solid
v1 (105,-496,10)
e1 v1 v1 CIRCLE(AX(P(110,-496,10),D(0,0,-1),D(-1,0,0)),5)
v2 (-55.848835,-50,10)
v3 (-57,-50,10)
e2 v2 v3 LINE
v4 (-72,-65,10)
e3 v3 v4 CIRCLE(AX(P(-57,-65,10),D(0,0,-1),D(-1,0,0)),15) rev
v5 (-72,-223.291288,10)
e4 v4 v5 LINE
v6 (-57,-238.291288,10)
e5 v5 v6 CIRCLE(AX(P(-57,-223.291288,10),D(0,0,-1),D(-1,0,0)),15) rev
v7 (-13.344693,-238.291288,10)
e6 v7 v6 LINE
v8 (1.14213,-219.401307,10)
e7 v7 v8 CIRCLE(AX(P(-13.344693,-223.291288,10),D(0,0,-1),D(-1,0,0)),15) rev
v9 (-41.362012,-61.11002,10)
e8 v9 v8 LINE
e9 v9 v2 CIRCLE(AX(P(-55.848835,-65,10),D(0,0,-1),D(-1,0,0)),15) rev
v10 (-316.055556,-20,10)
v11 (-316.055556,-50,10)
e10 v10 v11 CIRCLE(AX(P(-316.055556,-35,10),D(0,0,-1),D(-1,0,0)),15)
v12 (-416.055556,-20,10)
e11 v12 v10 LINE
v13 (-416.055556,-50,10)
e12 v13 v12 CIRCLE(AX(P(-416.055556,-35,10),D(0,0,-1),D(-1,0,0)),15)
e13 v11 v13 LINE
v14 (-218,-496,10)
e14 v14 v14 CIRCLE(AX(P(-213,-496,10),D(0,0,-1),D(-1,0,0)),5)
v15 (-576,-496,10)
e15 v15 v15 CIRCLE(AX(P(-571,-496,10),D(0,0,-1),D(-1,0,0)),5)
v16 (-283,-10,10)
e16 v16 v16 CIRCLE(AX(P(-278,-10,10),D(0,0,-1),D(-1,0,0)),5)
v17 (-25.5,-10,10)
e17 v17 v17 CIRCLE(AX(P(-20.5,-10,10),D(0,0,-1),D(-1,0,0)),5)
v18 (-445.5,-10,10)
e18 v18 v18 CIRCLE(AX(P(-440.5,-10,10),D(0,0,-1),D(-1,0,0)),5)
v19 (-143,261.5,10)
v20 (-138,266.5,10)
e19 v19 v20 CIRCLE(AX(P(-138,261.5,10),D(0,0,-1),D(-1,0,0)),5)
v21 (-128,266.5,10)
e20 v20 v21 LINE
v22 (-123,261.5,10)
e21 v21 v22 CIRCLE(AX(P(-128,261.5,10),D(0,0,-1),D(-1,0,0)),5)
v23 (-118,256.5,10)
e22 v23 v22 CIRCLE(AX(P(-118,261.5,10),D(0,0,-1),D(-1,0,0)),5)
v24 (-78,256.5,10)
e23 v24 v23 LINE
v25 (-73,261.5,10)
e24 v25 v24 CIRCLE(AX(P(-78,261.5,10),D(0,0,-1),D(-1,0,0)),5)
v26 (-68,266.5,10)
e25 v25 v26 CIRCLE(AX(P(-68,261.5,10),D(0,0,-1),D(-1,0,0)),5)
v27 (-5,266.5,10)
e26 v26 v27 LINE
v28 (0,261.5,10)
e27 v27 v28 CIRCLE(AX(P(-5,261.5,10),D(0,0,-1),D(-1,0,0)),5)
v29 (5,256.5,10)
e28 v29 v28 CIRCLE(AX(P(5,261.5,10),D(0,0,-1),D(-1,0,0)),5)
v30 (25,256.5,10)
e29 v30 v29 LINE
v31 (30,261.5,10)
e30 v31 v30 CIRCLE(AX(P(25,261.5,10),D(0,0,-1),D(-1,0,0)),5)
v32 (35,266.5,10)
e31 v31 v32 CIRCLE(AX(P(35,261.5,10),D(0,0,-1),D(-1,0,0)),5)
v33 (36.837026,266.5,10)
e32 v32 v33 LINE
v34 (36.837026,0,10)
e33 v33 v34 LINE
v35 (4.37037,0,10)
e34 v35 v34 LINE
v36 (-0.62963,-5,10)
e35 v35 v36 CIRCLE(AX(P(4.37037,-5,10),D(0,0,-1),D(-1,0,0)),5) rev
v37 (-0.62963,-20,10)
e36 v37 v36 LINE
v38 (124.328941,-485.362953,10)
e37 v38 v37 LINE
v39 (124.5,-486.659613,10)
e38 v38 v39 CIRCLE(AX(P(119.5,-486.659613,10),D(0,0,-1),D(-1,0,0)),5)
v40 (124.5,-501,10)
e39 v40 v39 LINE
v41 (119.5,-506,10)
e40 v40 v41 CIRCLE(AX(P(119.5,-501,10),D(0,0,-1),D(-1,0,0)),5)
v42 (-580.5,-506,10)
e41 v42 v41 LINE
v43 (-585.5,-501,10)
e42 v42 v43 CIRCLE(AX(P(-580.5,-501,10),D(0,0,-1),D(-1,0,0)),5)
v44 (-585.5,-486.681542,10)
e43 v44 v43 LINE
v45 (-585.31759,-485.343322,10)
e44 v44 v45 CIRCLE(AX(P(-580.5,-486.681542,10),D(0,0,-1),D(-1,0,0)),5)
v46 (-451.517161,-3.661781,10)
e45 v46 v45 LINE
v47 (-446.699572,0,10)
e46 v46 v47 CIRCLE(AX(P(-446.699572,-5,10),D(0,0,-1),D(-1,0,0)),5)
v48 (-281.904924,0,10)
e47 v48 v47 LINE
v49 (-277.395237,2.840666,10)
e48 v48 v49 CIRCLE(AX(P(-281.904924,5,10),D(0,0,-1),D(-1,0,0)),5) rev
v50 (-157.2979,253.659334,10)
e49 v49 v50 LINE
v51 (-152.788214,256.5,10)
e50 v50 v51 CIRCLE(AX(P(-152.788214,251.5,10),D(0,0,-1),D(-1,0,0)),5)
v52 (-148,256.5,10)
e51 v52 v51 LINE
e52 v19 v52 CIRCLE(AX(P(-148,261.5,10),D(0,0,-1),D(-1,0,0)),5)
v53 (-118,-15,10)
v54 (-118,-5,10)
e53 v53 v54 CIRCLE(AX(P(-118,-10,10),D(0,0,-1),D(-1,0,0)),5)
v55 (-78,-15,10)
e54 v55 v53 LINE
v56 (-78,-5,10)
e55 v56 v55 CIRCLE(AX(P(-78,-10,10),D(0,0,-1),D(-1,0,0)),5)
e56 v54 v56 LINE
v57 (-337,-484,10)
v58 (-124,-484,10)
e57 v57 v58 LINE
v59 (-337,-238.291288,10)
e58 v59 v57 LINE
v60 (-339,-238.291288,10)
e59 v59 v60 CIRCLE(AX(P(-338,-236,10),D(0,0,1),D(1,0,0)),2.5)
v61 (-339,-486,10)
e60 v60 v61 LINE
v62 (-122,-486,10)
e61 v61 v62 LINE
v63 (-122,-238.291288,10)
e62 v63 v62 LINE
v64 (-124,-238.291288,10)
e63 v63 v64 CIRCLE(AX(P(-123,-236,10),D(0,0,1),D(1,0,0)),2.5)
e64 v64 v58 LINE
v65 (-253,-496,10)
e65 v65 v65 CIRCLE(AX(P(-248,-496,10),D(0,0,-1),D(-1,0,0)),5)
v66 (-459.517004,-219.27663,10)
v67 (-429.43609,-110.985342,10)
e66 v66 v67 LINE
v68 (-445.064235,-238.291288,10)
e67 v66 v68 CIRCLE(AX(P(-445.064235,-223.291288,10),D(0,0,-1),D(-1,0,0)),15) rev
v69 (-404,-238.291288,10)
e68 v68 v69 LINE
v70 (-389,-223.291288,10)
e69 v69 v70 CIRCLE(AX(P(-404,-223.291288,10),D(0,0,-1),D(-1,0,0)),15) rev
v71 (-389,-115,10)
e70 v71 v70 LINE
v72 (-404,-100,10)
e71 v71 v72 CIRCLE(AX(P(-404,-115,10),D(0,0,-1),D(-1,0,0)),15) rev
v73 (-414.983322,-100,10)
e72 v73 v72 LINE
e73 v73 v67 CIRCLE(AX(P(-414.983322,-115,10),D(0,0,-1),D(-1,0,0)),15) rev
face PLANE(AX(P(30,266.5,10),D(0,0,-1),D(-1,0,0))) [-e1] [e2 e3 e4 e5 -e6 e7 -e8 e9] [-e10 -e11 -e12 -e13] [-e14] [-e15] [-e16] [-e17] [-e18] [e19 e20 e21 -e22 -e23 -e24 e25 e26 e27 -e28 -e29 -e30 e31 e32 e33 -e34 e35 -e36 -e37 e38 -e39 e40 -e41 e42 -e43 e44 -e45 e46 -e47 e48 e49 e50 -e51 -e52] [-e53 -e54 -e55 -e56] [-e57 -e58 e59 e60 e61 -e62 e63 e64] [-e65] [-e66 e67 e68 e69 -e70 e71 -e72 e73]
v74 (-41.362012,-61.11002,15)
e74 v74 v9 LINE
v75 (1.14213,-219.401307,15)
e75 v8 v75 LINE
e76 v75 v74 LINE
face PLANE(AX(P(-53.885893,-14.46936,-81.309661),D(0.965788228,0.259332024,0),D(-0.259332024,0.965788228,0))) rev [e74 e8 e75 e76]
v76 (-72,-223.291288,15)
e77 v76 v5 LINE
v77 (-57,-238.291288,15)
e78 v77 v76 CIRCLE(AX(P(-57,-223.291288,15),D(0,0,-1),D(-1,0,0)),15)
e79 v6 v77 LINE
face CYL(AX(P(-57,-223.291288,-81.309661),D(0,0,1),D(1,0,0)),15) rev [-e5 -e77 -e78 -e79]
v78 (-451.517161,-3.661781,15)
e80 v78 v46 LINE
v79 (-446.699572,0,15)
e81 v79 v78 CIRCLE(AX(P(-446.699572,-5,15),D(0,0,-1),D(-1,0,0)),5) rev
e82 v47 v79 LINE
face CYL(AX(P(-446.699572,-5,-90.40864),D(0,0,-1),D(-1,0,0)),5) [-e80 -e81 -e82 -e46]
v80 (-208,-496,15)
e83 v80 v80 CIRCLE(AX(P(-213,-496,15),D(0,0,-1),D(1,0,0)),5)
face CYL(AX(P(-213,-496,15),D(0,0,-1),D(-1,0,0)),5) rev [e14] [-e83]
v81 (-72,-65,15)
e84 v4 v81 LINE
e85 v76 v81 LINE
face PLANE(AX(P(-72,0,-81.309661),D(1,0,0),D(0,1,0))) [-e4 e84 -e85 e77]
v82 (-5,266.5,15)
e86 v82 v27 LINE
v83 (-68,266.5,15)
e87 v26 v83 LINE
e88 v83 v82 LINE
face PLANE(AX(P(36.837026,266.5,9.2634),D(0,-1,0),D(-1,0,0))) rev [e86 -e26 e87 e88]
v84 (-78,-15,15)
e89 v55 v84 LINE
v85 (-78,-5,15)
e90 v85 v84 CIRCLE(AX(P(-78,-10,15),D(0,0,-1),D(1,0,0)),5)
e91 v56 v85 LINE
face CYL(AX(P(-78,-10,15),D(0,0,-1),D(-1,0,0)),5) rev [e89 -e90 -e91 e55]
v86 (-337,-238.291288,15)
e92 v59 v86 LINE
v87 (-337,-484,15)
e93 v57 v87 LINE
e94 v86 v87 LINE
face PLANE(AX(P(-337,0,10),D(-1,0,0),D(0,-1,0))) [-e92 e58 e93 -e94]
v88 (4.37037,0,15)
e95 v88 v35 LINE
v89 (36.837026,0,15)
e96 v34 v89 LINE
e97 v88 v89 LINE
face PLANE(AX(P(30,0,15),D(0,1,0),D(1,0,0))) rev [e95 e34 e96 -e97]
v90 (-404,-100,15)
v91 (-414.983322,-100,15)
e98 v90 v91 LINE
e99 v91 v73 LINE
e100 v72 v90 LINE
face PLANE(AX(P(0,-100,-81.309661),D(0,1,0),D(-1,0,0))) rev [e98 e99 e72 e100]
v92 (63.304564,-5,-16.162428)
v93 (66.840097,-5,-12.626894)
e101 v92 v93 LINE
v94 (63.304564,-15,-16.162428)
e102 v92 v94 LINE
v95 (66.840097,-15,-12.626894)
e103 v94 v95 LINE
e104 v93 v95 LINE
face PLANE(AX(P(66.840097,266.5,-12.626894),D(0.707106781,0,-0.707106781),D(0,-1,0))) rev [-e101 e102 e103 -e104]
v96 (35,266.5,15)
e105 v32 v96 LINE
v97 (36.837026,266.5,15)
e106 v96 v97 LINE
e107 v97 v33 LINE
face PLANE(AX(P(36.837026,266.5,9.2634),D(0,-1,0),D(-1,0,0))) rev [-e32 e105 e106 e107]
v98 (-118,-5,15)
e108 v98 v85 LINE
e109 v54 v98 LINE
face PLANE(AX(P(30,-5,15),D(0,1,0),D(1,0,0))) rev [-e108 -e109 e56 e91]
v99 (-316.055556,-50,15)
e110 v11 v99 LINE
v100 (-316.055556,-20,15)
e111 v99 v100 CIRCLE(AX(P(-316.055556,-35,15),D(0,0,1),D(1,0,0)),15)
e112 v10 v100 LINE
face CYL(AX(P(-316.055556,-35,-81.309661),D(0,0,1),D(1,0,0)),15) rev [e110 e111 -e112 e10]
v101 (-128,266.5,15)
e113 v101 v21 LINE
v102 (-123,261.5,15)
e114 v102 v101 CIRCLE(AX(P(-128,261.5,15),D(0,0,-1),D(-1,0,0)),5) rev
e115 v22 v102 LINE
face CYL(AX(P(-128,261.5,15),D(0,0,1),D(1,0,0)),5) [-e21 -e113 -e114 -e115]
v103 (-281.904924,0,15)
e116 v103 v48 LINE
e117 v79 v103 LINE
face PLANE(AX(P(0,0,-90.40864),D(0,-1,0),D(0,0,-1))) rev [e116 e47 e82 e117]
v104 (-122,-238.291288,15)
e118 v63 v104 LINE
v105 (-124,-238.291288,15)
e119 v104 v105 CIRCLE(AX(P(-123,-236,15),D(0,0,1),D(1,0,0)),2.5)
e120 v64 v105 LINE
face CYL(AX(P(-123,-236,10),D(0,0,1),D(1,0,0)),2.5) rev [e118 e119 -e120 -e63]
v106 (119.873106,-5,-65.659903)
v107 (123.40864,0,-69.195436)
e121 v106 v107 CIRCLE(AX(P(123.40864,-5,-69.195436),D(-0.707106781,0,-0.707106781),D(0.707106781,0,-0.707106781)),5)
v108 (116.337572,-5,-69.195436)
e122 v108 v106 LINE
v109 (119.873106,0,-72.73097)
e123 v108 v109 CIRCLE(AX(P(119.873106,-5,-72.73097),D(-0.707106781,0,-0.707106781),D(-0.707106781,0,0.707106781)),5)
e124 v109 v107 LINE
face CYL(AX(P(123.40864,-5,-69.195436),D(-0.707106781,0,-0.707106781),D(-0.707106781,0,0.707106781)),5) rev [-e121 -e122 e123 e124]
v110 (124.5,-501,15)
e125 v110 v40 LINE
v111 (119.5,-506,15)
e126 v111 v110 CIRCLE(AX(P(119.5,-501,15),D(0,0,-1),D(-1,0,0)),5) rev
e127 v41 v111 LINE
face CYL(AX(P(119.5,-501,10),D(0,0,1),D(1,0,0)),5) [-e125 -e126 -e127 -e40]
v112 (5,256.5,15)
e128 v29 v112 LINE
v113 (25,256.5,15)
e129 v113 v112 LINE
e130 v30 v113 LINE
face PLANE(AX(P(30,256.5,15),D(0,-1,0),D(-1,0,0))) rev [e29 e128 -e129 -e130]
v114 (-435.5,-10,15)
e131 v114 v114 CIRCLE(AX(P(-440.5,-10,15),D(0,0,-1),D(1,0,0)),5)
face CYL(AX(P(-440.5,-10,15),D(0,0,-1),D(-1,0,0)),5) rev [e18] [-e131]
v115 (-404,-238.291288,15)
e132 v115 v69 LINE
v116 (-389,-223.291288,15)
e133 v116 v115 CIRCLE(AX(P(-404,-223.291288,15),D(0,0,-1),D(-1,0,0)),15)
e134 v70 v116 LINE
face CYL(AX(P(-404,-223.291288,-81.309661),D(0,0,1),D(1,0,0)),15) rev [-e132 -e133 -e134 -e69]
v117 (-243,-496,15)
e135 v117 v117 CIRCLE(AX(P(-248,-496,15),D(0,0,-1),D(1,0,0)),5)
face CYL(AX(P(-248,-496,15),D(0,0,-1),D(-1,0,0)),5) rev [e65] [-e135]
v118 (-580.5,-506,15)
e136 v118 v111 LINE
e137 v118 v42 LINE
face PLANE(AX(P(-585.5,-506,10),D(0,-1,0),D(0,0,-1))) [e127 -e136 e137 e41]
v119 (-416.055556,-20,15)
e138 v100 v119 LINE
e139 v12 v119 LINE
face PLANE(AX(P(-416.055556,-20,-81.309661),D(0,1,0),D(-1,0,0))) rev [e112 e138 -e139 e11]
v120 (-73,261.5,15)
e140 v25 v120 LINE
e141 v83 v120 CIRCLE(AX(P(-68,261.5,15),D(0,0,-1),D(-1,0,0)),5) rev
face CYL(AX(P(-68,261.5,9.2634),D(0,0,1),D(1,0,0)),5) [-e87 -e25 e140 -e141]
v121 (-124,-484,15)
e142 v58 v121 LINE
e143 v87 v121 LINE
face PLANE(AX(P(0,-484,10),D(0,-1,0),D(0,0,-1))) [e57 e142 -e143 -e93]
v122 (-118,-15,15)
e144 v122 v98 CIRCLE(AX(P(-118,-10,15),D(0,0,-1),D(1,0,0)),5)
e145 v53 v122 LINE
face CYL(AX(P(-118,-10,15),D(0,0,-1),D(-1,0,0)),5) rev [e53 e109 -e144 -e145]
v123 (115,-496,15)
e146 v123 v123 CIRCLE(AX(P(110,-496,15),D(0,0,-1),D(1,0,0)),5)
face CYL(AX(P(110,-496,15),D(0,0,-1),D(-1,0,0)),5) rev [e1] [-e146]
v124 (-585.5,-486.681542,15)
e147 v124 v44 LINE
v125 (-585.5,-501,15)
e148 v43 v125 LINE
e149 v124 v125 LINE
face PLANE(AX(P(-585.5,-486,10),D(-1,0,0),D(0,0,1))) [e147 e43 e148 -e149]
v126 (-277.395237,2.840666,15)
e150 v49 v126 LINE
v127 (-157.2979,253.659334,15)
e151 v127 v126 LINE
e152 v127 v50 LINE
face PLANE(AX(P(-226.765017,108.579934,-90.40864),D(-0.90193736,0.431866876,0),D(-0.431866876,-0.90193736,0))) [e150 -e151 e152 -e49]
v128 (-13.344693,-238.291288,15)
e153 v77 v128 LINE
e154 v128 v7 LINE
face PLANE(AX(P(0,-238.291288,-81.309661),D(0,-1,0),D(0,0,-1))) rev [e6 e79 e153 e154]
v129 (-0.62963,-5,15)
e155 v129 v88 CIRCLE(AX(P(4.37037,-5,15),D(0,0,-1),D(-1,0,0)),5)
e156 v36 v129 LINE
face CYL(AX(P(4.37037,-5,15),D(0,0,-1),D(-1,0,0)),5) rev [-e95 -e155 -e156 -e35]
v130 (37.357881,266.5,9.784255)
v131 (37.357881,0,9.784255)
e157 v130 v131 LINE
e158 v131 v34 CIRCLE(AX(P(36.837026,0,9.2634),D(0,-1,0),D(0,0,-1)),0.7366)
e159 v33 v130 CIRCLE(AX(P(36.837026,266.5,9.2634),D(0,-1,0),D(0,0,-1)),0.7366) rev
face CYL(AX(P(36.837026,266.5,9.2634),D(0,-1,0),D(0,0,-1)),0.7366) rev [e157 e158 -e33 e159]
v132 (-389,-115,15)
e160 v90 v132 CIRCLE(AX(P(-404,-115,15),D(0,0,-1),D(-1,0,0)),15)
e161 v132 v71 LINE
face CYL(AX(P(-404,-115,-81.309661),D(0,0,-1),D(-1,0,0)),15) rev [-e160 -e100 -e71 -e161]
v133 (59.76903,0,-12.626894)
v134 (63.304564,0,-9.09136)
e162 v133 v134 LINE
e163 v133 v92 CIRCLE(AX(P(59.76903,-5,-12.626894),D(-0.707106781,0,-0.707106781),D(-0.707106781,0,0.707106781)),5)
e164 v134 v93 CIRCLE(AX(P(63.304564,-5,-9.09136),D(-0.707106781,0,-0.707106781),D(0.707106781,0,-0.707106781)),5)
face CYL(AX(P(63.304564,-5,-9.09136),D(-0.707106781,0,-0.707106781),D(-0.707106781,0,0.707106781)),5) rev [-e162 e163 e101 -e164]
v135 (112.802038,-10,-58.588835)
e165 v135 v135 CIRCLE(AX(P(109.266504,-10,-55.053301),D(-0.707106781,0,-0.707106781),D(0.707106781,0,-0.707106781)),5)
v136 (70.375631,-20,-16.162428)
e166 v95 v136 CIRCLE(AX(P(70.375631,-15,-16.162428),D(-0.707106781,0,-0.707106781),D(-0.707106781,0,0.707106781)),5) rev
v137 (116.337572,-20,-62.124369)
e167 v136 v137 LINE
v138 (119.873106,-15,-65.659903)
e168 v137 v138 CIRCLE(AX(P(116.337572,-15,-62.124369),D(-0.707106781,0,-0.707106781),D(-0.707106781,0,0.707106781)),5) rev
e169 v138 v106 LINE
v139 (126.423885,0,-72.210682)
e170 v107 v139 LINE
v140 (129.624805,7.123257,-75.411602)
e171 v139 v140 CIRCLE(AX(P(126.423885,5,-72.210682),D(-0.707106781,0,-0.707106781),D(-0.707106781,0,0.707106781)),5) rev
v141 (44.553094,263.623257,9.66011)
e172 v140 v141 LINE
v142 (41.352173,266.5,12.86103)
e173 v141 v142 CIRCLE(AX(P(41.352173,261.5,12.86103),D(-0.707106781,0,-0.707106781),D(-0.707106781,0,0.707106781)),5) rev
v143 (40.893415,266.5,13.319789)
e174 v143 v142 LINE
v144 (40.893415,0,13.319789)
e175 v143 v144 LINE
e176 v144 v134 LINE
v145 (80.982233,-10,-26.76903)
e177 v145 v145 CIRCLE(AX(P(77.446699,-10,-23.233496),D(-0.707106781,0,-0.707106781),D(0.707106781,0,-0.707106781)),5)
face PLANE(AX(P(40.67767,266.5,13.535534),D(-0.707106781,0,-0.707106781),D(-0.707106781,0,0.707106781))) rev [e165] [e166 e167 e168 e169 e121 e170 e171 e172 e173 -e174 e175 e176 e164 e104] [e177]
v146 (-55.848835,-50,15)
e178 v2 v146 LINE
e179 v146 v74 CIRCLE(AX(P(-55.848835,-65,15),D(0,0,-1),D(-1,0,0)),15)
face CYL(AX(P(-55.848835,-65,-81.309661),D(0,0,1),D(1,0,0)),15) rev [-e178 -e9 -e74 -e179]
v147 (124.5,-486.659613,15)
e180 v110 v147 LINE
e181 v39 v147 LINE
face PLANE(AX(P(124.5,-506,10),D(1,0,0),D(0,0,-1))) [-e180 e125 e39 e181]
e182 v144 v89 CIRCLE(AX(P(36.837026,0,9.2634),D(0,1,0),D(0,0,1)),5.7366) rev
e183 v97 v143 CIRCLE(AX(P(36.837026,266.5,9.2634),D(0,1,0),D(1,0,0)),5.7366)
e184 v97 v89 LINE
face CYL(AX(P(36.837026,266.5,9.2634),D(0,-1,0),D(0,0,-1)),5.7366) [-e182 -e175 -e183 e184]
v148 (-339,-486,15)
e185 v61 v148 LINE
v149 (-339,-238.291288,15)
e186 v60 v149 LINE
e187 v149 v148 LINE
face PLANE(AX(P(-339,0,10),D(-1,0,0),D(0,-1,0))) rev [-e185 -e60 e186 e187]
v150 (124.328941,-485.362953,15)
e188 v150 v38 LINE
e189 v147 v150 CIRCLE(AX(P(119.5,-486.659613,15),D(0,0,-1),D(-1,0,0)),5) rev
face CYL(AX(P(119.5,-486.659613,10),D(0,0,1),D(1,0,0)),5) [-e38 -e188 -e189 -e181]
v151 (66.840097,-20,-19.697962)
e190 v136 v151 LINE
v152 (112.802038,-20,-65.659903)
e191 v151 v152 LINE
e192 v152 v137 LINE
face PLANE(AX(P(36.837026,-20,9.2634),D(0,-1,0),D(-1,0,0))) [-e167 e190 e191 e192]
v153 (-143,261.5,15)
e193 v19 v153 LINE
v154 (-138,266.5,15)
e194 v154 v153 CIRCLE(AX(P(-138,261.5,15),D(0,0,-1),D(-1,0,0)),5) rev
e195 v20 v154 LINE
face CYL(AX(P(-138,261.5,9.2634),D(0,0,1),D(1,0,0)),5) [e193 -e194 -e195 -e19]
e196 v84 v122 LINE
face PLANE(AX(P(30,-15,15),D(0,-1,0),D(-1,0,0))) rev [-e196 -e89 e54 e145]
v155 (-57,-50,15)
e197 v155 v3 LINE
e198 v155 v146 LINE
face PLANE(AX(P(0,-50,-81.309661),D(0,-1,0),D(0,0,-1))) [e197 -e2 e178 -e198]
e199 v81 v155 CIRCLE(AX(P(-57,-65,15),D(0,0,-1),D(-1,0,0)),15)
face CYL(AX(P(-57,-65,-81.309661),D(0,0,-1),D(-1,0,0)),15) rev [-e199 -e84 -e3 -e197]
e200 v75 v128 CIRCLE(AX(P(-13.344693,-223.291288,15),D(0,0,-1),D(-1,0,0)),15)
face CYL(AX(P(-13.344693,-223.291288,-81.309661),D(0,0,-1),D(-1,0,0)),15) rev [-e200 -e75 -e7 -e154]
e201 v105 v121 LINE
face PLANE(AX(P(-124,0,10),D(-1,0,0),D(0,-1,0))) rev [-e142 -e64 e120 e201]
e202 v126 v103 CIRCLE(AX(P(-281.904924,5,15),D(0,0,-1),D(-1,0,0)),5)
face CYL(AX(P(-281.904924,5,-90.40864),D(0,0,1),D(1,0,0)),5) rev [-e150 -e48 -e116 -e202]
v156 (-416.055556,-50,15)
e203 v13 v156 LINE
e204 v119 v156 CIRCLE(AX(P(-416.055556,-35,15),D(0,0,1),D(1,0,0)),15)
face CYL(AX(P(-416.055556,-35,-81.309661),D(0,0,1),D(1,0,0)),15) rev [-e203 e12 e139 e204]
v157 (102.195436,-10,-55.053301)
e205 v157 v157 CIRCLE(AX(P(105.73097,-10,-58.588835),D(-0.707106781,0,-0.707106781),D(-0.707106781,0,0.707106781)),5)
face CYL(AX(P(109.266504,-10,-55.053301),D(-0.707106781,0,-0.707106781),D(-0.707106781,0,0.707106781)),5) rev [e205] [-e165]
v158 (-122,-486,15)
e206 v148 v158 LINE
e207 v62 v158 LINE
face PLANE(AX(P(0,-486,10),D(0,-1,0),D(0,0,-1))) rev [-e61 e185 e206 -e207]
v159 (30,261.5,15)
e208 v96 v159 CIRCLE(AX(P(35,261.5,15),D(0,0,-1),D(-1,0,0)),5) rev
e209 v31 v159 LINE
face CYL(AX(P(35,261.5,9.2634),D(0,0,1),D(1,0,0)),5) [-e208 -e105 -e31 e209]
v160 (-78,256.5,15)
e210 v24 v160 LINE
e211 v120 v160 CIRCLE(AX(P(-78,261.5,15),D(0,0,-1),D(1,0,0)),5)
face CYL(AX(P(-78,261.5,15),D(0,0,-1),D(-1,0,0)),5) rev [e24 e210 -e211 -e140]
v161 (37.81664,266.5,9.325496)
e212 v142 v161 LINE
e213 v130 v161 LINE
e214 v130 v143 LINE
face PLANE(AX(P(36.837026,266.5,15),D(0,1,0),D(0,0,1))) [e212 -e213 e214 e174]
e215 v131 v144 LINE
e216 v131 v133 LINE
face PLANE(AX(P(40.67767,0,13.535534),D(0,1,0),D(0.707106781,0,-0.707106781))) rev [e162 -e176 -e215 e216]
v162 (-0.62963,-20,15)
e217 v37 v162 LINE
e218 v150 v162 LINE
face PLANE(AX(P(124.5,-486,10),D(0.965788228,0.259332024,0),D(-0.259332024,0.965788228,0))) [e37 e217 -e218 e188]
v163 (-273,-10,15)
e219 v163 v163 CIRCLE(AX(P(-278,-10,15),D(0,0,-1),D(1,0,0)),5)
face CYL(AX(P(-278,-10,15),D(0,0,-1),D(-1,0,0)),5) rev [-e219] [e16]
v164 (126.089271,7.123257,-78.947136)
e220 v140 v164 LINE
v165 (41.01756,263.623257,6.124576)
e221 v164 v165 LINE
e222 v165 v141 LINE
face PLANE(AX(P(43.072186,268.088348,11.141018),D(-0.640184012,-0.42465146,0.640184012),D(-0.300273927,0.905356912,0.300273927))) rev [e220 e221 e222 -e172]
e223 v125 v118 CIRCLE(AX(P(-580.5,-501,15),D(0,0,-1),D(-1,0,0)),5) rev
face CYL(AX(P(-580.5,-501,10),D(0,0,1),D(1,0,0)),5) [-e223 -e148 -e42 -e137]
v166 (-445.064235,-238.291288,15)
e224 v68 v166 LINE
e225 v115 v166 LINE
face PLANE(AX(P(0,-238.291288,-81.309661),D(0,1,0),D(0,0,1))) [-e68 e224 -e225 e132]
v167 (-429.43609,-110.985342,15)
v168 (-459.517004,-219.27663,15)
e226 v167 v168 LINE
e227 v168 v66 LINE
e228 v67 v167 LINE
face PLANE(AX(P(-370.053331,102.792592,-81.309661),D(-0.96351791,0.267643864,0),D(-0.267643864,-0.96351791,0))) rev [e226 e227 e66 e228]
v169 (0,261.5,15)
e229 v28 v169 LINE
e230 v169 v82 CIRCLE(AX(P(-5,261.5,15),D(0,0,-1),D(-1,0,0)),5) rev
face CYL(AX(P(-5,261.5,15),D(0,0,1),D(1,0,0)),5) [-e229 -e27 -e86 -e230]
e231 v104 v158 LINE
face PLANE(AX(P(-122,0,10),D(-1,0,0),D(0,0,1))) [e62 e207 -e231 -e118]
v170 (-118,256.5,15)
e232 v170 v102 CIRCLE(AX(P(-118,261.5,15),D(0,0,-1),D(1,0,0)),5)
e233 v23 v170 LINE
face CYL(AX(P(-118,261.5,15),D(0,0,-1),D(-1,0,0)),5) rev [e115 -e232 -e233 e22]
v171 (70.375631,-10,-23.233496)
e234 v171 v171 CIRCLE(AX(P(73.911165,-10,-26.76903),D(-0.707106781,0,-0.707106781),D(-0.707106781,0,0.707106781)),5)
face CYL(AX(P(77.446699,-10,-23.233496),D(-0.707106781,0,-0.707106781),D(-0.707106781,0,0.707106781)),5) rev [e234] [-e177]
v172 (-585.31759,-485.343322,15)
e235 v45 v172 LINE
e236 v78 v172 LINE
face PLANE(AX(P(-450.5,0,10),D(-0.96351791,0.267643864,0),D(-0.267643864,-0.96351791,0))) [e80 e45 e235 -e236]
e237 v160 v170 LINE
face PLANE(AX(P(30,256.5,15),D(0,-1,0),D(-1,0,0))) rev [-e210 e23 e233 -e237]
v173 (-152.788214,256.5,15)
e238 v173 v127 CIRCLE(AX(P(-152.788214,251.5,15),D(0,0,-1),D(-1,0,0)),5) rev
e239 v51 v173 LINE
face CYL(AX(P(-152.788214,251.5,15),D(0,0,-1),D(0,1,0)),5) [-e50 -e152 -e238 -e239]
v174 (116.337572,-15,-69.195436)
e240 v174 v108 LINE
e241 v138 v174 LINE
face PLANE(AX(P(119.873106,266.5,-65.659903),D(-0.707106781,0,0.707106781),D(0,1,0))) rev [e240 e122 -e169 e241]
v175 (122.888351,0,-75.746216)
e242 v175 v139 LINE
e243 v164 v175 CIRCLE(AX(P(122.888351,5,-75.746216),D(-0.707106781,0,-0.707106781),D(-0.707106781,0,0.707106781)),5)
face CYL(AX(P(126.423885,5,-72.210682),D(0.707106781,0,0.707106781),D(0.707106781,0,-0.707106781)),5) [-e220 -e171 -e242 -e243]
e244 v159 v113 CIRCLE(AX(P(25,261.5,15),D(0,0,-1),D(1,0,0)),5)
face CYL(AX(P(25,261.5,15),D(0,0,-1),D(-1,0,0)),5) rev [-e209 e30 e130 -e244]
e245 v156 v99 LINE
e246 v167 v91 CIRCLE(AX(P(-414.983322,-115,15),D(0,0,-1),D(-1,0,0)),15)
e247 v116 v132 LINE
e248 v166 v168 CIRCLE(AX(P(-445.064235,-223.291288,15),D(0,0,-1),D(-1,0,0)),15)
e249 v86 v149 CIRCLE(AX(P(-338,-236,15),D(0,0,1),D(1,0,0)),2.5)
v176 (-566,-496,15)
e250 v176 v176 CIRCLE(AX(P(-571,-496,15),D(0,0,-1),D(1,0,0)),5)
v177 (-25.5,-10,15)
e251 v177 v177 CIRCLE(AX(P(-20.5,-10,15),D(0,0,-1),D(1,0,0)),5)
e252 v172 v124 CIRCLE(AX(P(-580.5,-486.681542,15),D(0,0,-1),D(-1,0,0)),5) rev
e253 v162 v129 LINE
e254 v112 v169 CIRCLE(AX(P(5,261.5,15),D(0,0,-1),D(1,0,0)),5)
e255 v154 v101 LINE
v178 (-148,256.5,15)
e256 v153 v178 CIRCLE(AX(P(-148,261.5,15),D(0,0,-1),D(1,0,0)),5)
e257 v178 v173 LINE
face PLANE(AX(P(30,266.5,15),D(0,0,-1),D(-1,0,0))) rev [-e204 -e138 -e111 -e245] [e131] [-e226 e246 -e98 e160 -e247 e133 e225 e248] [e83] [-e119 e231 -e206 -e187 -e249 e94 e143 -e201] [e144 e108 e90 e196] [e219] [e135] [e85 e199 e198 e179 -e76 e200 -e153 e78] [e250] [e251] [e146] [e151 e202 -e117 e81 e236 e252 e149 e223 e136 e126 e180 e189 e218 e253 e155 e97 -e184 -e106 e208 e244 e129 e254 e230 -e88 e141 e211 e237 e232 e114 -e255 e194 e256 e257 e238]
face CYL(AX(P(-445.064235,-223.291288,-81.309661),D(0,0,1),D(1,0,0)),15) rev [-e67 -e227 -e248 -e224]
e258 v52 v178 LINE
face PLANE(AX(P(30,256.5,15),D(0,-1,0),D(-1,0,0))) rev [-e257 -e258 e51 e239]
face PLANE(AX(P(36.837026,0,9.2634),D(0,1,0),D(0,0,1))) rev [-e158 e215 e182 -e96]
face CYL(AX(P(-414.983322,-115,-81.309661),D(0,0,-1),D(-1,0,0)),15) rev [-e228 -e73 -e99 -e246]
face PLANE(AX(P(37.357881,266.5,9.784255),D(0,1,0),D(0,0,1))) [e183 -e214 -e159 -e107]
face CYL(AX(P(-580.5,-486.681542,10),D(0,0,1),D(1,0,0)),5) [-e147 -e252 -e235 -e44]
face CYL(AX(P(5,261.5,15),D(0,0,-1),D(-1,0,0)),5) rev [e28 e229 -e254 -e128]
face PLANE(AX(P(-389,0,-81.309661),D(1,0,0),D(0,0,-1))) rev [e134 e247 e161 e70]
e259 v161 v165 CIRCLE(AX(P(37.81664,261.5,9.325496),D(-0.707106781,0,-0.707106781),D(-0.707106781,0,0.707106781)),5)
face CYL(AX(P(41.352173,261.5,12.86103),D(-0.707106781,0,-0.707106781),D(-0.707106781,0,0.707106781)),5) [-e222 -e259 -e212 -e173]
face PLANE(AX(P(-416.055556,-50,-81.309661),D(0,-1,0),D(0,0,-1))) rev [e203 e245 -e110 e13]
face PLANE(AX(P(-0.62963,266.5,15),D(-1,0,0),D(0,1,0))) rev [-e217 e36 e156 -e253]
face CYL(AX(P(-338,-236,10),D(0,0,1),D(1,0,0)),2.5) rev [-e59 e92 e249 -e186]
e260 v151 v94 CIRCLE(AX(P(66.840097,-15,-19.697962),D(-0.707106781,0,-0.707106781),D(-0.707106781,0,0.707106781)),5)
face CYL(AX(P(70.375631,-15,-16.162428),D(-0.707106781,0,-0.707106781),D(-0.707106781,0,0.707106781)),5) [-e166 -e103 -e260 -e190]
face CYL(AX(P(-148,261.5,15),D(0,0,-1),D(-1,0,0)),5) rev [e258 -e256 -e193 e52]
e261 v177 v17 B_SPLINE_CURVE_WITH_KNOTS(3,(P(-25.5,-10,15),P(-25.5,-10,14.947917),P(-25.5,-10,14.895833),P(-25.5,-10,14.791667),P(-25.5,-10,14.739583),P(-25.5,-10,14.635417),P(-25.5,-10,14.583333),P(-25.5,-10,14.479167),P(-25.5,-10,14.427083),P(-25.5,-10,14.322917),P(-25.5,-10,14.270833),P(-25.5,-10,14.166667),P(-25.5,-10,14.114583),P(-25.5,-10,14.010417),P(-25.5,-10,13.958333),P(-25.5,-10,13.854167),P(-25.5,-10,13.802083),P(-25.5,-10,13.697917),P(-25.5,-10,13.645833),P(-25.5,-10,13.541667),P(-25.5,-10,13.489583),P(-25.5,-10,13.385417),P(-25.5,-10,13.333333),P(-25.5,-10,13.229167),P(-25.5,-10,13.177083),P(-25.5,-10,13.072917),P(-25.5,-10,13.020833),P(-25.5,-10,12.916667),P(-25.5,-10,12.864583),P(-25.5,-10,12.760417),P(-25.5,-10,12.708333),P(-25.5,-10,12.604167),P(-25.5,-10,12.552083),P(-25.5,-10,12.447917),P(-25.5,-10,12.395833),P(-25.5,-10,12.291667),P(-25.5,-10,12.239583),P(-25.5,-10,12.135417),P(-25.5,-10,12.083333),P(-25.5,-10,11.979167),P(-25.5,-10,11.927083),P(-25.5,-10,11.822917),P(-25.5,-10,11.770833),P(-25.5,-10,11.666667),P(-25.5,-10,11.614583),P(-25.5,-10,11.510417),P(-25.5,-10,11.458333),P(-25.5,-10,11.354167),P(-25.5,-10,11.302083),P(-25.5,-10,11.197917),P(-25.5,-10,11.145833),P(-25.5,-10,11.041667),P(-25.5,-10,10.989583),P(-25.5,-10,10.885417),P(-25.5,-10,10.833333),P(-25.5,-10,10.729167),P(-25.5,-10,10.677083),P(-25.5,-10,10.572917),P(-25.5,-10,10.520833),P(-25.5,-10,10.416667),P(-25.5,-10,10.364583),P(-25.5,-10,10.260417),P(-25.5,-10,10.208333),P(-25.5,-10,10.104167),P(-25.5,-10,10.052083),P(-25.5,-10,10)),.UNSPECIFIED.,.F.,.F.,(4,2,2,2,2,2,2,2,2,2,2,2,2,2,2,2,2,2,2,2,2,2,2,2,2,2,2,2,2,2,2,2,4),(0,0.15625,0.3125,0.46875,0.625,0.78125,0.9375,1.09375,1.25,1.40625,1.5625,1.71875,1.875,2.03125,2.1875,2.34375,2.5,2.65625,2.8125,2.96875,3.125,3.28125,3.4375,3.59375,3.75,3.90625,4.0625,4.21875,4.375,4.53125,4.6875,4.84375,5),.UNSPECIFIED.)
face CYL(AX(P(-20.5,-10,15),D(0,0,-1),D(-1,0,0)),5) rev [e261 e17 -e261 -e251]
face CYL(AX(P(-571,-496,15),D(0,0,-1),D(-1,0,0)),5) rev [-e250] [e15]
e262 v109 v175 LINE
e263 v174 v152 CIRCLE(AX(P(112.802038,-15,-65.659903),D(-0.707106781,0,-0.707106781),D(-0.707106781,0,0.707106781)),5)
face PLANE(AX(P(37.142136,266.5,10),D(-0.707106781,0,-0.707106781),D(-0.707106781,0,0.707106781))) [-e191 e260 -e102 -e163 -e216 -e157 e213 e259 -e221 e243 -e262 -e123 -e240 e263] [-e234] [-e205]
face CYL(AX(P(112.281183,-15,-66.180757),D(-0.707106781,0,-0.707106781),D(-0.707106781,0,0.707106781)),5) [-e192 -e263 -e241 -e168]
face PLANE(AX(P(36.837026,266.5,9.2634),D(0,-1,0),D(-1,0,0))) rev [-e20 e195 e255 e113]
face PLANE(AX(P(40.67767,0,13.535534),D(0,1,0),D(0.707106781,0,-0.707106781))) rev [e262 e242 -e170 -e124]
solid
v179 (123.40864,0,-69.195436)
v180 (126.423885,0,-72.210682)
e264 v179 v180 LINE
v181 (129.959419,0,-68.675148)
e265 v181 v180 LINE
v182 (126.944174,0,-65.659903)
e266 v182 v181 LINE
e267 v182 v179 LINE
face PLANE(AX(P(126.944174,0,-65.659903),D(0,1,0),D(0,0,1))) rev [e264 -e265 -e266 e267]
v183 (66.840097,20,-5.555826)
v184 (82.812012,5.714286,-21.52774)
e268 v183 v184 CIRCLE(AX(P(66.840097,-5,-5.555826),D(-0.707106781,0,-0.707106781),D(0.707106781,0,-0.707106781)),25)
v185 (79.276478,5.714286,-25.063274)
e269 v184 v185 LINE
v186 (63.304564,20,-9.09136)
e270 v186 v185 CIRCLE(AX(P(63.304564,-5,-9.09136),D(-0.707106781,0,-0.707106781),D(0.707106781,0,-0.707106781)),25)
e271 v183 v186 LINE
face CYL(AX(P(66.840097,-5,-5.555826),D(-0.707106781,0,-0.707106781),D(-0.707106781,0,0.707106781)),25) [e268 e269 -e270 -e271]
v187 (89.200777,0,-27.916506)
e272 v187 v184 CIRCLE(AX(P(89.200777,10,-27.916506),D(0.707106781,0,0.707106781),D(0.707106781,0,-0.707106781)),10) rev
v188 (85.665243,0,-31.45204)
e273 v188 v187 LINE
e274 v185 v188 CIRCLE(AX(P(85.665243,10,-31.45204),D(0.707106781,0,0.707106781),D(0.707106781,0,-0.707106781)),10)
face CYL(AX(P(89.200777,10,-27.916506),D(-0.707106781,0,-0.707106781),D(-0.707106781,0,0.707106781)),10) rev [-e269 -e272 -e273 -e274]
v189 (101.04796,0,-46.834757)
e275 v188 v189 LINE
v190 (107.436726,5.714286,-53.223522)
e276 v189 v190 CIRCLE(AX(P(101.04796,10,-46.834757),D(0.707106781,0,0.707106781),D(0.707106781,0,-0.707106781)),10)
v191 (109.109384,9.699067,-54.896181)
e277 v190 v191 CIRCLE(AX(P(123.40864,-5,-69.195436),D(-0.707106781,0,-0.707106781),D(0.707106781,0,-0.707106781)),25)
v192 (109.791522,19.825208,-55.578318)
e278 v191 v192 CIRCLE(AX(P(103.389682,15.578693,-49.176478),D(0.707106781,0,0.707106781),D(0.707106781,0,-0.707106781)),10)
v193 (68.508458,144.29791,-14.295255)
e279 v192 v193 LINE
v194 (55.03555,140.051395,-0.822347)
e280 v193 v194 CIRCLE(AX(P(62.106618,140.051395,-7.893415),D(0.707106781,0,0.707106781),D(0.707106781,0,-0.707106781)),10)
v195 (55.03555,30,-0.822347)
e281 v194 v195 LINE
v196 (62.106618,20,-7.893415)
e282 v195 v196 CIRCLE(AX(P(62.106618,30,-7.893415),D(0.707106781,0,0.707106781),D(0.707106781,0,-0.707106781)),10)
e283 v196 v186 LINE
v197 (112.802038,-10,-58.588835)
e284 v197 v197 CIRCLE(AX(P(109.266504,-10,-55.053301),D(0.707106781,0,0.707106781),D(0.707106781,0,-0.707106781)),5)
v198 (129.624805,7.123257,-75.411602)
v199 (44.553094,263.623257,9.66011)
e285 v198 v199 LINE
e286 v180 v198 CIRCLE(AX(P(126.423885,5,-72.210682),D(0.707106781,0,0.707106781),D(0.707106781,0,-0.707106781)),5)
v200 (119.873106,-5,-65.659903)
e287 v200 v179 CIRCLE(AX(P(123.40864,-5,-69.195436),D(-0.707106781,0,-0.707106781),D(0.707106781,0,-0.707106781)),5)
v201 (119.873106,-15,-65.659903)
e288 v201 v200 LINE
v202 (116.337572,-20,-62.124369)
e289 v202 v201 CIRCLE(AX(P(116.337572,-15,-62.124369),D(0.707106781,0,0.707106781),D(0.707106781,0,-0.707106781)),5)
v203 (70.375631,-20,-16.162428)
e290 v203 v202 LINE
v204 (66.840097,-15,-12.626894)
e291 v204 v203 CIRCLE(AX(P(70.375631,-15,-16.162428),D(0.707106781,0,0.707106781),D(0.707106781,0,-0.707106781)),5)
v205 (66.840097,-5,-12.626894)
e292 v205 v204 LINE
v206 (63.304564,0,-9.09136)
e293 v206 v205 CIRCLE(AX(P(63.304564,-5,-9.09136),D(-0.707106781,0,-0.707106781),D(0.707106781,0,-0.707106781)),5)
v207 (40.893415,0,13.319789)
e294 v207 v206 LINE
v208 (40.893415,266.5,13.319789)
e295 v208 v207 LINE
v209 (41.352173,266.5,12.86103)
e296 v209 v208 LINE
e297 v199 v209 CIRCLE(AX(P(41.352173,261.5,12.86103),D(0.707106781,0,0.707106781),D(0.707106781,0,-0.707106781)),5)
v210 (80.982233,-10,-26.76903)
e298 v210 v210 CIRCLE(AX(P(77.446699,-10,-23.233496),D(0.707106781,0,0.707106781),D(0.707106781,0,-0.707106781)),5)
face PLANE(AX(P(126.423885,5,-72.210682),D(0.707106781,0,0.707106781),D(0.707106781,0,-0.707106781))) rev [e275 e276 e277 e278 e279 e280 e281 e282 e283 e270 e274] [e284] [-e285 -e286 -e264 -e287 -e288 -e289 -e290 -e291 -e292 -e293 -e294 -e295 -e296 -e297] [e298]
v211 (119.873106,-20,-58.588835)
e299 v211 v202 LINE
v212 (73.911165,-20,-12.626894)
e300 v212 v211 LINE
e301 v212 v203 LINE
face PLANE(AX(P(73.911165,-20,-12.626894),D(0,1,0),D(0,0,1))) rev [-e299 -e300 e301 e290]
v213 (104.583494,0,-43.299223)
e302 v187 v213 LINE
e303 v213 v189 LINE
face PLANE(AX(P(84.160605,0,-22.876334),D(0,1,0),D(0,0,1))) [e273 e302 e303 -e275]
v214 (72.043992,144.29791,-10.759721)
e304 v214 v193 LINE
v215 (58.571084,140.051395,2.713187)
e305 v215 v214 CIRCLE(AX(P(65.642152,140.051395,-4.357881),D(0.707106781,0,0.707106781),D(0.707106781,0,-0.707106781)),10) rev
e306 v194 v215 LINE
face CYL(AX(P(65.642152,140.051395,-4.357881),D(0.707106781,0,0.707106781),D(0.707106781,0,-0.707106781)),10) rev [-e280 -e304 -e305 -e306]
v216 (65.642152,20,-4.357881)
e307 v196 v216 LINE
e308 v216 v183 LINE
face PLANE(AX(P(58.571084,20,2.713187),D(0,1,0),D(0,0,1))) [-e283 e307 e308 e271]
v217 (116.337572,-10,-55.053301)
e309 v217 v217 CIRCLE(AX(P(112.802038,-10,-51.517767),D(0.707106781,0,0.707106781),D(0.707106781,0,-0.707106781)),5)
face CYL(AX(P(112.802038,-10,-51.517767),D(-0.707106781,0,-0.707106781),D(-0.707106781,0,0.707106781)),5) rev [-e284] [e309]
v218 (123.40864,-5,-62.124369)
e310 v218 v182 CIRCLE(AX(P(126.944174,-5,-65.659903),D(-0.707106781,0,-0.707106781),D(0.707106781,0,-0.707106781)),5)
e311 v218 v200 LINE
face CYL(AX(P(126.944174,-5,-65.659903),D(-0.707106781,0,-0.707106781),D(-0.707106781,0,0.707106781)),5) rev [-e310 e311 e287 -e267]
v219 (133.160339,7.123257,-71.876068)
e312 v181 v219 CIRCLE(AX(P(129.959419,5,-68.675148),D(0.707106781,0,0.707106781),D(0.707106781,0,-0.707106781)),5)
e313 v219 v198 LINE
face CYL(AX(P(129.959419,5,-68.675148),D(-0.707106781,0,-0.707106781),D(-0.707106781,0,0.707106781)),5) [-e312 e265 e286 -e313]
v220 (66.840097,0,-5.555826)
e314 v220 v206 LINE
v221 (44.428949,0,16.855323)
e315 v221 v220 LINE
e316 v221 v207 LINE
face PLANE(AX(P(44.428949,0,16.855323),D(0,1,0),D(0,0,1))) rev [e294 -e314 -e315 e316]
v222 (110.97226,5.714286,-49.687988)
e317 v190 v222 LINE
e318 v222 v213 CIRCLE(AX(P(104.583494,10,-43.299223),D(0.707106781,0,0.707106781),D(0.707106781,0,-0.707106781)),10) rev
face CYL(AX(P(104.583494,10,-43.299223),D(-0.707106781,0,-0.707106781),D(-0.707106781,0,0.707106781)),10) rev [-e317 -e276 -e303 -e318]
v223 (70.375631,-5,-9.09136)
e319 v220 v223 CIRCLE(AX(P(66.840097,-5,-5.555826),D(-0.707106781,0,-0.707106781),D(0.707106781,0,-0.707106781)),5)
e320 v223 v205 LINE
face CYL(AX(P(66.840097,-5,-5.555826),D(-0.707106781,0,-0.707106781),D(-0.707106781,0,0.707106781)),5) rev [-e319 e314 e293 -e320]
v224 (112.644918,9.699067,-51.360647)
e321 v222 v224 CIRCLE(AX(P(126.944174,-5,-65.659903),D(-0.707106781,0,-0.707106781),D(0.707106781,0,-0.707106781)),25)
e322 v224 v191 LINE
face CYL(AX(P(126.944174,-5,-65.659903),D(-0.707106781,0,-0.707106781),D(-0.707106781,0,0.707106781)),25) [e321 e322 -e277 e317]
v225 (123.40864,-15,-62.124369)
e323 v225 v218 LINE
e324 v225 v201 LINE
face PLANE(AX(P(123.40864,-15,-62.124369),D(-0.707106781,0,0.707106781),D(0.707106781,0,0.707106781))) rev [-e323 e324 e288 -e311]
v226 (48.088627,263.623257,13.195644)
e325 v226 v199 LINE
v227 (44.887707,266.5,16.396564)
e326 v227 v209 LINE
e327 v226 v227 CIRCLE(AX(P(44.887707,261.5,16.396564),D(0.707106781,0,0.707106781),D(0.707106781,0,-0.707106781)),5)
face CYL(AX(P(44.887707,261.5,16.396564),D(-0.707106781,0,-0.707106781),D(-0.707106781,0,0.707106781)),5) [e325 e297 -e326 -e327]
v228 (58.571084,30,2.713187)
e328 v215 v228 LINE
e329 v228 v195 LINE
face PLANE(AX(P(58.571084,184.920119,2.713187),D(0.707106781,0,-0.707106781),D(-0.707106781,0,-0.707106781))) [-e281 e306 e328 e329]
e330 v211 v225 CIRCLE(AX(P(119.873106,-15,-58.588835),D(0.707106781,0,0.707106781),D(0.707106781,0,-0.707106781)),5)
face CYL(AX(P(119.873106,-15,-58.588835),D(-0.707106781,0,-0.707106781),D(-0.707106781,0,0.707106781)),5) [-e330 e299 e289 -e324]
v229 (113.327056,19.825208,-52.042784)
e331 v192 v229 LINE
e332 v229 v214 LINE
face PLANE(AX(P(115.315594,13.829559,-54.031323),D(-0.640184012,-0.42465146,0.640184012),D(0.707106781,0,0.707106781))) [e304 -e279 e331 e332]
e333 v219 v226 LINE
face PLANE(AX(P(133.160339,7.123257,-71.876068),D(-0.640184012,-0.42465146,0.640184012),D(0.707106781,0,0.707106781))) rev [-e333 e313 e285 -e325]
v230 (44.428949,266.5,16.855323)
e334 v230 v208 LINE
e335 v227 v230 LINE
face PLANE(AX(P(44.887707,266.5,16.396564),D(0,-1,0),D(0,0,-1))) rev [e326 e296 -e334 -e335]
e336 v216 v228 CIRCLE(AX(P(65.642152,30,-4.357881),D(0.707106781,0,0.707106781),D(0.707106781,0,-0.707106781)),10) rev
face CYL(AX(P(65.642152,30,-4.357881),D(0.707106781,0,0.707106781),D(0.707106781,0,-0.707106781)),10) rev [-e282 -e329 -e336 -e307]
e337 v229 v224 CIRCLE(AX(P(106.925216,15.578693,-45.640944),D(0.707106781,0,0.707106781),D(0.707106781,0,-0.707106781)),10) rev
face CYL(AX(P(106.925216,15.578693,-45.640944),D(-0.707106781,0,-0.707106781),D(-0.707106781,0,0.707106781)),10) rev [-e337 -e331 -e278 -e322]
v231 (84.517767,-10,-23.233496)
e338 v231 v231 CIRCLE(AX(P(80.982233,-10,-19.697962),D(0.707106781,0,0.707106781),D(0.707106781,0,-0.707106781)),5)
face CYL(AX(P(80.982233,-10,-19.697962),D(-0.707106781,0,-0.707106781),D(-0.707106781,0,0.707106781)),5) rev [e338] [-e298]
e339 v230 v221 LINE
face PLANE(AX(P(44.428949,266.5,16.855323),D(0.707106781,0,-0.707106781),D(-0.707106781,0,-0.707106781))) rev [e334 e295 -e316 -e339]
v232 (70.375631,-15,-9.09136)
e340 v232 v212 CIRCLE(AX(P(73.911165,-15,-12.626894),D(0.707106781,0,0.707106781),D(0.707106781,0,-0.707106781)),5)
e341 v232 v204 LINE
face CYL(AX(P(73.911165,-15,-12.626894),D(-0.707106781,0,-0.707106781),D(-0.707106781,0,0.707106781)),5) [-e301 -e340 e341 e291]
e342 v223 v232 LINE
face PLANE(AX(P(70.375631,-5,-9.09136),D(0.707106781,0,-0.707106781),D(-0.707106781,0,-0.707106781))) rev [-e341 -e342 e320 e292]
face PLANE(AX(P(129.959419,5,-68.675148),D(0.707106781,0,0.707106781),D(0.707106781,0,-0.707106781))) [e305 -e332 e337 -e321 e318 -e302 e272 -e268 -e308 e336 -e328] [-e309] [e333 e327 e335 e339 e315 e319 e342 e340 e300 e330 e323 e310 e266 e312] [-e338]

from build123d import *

# Parameters (mm, degrees)
SM_BASE_FLANGE_1_DEPTH      = 266.5
SM_BASE_FLANGE_1_DEPTH_BACK = 20
EXTRUDE_2_DEPTH             = 5
CUT_EXTRUDE_1_DEPTH         = 781.997587301
SKETCH_16_R                 = 5
CUT_EXTRUDE_6_DEPTH         = 804.201519225
CUT_EXTRUDE_7_DEPTH         = 780.82164677
SKETCH_18_W                 = 41.523044305
SKETCH_18_H                 = 20
SKETCH_18_R                 = 5
CUT_EXTRUDE_8_DEPTH         = 780.82164677
CUT_EXTRUDE_9_DEPTH         = 5
CUT_EXTRUDE_10_DEPTH        = 780.82164677
FILLET_1_R                  = 5
FILLET_2_R                  = 15
FILLET_3_R                  = 5
SKETCH_26_R                 = 5
EXTRUDE_3_DEPTH             = 5
FILLET_4_R                  = 10


# Sheet-metal steps are written as plain solids
with BuildPart() as part:
    # Sketch 1 → ﾍﾞｰｽ-ﾌﾗﾝｼﾞ1 (new, two sides: drawn at the far end of the back side and taken through both)
    with BuildSketch(Plane(origin=(0, 0, 0), x_dir=(1, 0, 0), z_dir=(0, 1, 0)).offset(-SM_BASE_FLANGE_1_DEPTH_BACK)):
        with BuildLine():
            Line((137.550775542, 90.408639918), (37.357880769, -9.784254855))
            ThreePointArc((37.357880769, -9.784254855), (37.11891053, -9.943929664), (36.837025914, -10))
            Line((36.837025914, -10), (30, -10))
            Line((30, -10), (-450.5, -10))
            Line((-450.5, -10), (-450.5, -15))
            Line((-450.5, -15), (30, -15))
            Line((30, -15), (36.837025914, -15))
            ThreePointArc((36.837025914, -15), (39.032327692, -14.563327326), (40.893414675, -13.319788761))
            Line((40.893414675, -13.319788761), (141.086309448, 86.873106012))
            Line((141.086309448, 86.873106012), (137.550775542, 90.408639918))
        make_face()
    extrude(amount=SM_BASE_FLANGE_1_DEPTH + SM_BASE_FLANGE_1_DEPTH_BACK)

    # ｽｹｯﾁ15 → ﾎﾞｽ - 押し出し2 (add)
    with BuildSketch(Plane.XY.offset(15)):
        Polygon((-450.5, 0), (-585.5, -486), (-585.5, -506), (124.5, -506), (124.5, -486), (-6, 0), align=None)
    extrude(amount=-EXTRUDE_2_DEPTH)

    # ｽｹｯﾁ7 → ｶｯﾄ - 押し出し1 (cut, through all)
    with BuildSketch(Plane.XY.offset(15)):
        Polygon((-278.755408603, 0), (-151.149515417, 266.5), (-450.5, 266.5), (-450.5, 0), align=None)
    extrude(amount=-CUT_EXTRUDE_1_DEPTH, mode=Mode.SUBTRACT)

    # ｽｹｯﾁ16 → ｶｯﾄ - 押し出し6 (cut, through all)
    with BuildSketch(Plane(origin=(27.106601718, 0, 27.106601718), x_dir=(0.7071067811865438, 0, -0.7071067811865513), z_dir=(0.7071067811865513, 0, 0.7071067811865438))):
        with BuildLine():
            Line((23.323748893, 266.5), (148.323748893, 0))
            Line((148.323748893, 0), (136.191648507, 0))
            ThreePointArc((136.191648507, 0), (132.656114601, -1.464466094), (131.191648507, -5))
            Line((131.191648507, -5), (131.191648507, -20))
            Line((131.191648507, -20), (141.191648507, -20))
            Line((141.191648507, -20), (161.191648507, -20))
            Line((161.191648507, -20), (161.191648507, 266.5))
            Line((161.191648507, 266.5), (23.323748893, 266.5))
        make_face()
        with BuildLine():
            Line((51.191648507, 0), (19.497497865, 0))
            Line((19.497497865, 0), (19.497497865, -20))
            Line((19.497497865, -20), (46.191648507, -20))
            Line((46.191648507, -20), (56.191648507, -20))
            Line((56.191648507, -20), (56.191648507, -5))
            ThreePointArc((56.191648507, -5), (54.727182413, -1.464466094), (51.191648507, 0))
        make_face()
        with Locations(Location((116.191648507, -10, 0), (0, 0, 180))):
            Circle(SKETCH_16_R)
        with Locations(Location((71.191648507, -10, 0), (0, 0, 180))):
            Circle(SKETCH_16_R)
    extrude(amount=-CUT_EXTRUDE_6_DEPTH, mode=Mode.SUBTRACT)

    # ｽｹｯﾁ17 → ｶｯﾄ - 押し出し7 (cut, through all)
    with BuildSketch(Plane.XY.offset(15)):
        with BuildLine():
            Line((-416.055555556, -20), (-316.055555556, -20))
            ThreePointArc((-316.055555556, -20), (-301.055555556, -35), (-316.055555556, -50))
            Line((-316.055555556, -50), (-416.055555556, -50))
            ThreePointArc((-416.055555556, -50), (-431.055555556, -35), (-416.055555556, -20))
        make_face()
    extrude(amount=-CUT_EXTRUDE_7_DEPTH, mode=Mode.SUBTRACT)

    # ｽｹｯﾁ18 → ｶｯﾄ - 押し出し8 (cut, through all)
    with BuildSketch(Plane.XY.offset(15)):
        with BuildLine():
            Line((-78, -5), (-118, -5))
            ThreePointArc((-118, -5), (-123, -10), (-118, -15))
            Line((-118, -15), (-78, -15))
            ThreePointArc((-78, -15), (-73, -10), (-78, -5))
        make_face()
        with BuildLine():
            Line((-123, 266.5), (-123, 261.5))
            ThreePointArc((-123, 261.5), (-121.535533906, 257.964466094), (-118, 256.5))
            Line((-118, 256.5), (-78, 256.5))
            ThreePointArc((-78, 256.5), (-74.464466094, 257.964466094), (-73, 261.5))
            Line((-73, 261.5), (-73, 266.5))
            Line((-73, 266.5), (-123, 266.5))
        make_face()
        with BuildLine():
            ThreePointArc((0, 261.5), (1.464466094, 257.964466094), (5, 256.5))
            Line((5, 256.5), (25, 256.5))
            ThreePointArc((25, 256.5), (28.535533906, 257.964466094), (30, 261.5))
            Line((30, 261.5), (30, 266.5))
            Line((30, 266.5), (0, 266.5))
            Line((0, 266.5), (0, 261.5))
        make_face()
        with BuildLine():
            Line((-143, 266.5), (-151.149515417, 266.5))
            Line((-151.149515417, 266.5), (-155.937729045, 256.5))
            Line((-155.937729045, 256.5), (-148, 256.5))
            ThreePointArc((-148, 256.5), (-144.464466094, 257.964466094), (-143, 261.5))
            Line((-143, 261.5), (-143, 266.5))
        make_face()
        with Locations((20.131892523, -10)):
            Rectangle(SKETCH_18_W, SKETCH_18_H)
        with Locations(Location((110, -496, 0), (0, 0, 180))):
            Circle(SKETCH_18_R)
        with Locations(Location((-571, -496, 0), (0, 0, 180))):
            Circle(SKETCH_18_R)
        with Locations(Location((-213, -496, 0), (0, 0, 180))):
            Circle(SKETCH_18_R)
        with Locations(Location((-248, -496, 0), (0, 0, 180))):
            Circle(SKETCH_18_R)
        with Locations(Location((-440.5, -10, 0), (0, 0, 180))):
            Circle(SKETCH_18_R)
        with Locations(Location((-20.5, -10, 0), (0, 0, 180))):
            Circle(SKETCH_18_R)
        with Locations(Location((-278, -10, 0), (0, 0, 180))):
            Circle(SKETCH_18_R)
    extrude(amount=-CUT_EXTRUDE_8_DEPTH, mode=Mode.SUBTRACT)

    # ｽｹｯﾁ24 → ｶｯﾄ - 押し出し9 (cut)
    with BuildSketch(Plane.XY.offset(15)):
        with BuildLine():
            ThreePointArc((-337, -238.291287847), (-338, -233.5), (-339, -238.291287847))
            Line((-339, -238.291287847), (-339, -486))
            Line((-339, -486), (-122, -486))
            Line((-122, -486), (-122, -238.291287847))
            ThreePointArc((-122, -238.291287847), (-123, -233.5), (-124, -238.291287847))
            Line((-124, -238.291287847), (-124, -484))
            Line((-124, -484), (-337, -484))
            Line((-337, -484), (-337, -238.291287847))
        make_face()
    extrude(amount=-CUT_EXTRUDE_9_DEPTH, mode=Mode.SUBTRACT)

    # ｽｹｯﾁ25 → ｶｯﾄ - 押し出し10 (cut, through all)
    with BuildSketch(Plane.XY.offset(15)):
        Polygon((-44.345258018, -50), (-72, -50), (-72, -238.291287847), (6.214439645, -238.291287847), align=None)
        Polygon((-389, -238.291287847), (-389, -100), (-426.38460641, -100), (-464.798853035, -238.291287847), align=None)
    extrude(amount=-CUT_EXTRUDE_10_DEPTH, mode=Mode.SUBTRACT)

    # ﾌｨﾚｯﾄ1
    fillet_1_edges = [part.edges().sort_by_distance(p)[0] for p in [
        (-0.62962963, 0, 12.5),
    ]]
    fillet(fillet_1_edges, radius=FILLET_1_R)

    # ﾌｨﾚｯﾄ2
    fillet_2_edges = [part.edges().sort_by_distance(p)[0] for p in [
        (-389, -238.291287847, 12.5),
        (-464.798853035, -238.291287847, 12.5),
        (-426.38460641, -100, 12.5),
        (-389, -100, 12.5),
        (-72, -238.291287847, 12.5),
        (-72, -50, 12.5),
        (-44.345258018, -50, 12.5),
        (6.214439645, -238.291287847, 12.5),
    ]]
    fillet(fillet_2_edges, radius=FILLET_2_R)

    # ﾌｨﾚｯﾄ3
    fillet_3_edges = [part.edges().sort_by_distance(p)[0] for p in [
        (-155.937729045, 256.5, 12.5),
        (-143, 266.5, 12.5),
        (-123, 266.5, 12.5),
        (-73, 266.5, 12.5),
        (0, 266.5, 12.5),
        (30, 266.5, 12.5),
        (41.831215769, 266.5, 8.84645376),
        (130.219563418, 0, -79.541893888),
        (118.105339059, -20, -67.42766953),
        (65.07233047, -20, -14.394660941),
        (124.5, -486, 12.5),
        (124.5, -506, 12.5),
        (-585.5, -506, 12.5),
        (-585.5, -486, 12.5),
        (-450.5, 0, 12.5),
        (-278.755408603, 0, 12.5),
    ]]
    fillet(fillet_3_edges, radius=FILLET_3_R - 0.0001)  # a hair under: the kernel refuses the full size


with BuildPart() as body_2:
    # ｽｹｯﾁ26 → ﾎﾞｽ - 押し出し3 (new body)
    with BuildSketch(Plane(origin=(27.106601718, 0, 27.106601718), x_dir=(0.7071067811865438, 0, -0.7071067811865513), z_dir=(0.7071067811865513, 0, 0.7071067811865438))):
        with BuildLine():
            Line((144.982633837, 7.123257298), (24.673065357, 263.623257298))
            ThreePointArc((24.673065357, 263.623257298), (22.828044537, 265.719969579), (20.146280798, 266.5))
            Line((20.146280798, 266.5), (19.497497865, 266.5))
            Line((19.497497865, 266.5), (19.497497865, 0))
            Line((19.497497865, 0), (51.191648507, 0))
            ThreePointArc((51.191648507, 0), (54.727182413, -1.464466094), (56.191648507, -5))
            Line((56.191648507, -5), (56.191648507, -15))
            ThreePointArc((56.191648507, -15), (57.656114601, -18.535533906), (61.191648507, -20))
            Line((61.191648507, -20), (126.191648507, -20))
            ThreePointArc((126.191648507, -20), (129.727182413, -18.535533906), (131.191648507, -15))
            Line((131.191648507, -15), (131.191648507, -5))
            ThreePointArc((131.191648507, -5), (132.656114601, -1.464466094), (136.191648507, 0))
            Line((136.191648507, 0), (140.455849278, 0))
            ThreePointArc((140.455849278, 0), (144.675818857, 2.31823626), (144.982633837, 7.123257298))
        make_face()
        with Locations((116.191648507, -10)):
            Circle(SKETCH_26_R, mode=Mode.SUBTRACT)
        with Locations((71.191648507, -10)):
            Circle(SKETCH_26_R, mode=Mode.SUBTRACT)
        with BuildLine():
            Line((119.746353698, 13.829558641), (39.497497865, 184.920119276))
            Line((39.497497865, 184.920119276), (39.497497865, 20))
            Line((39.497497865, 20), (51.191648507, 20))
            ThreePointArc((51.191648507, 20), (67.003036808, 14.364916731), (75.686545935, 0))
            Line((75.686545935, 0), (111.696751079, 0))
            ThreePointArc((111.696751079, 0), (114.58519095, 7.576207371), (119.746353698, 13.829558641))
        make_face(mode=Mode.SUBTRACT)
    extrude(amount=EXTRUDE_3_DEPTH)

    # ﾌｨﾚｯﾄ4
    fillet_4_edges = [body_2.edges().sort_by_distance(p)[0] for p in [
        (107.855898796, 0, -50.107161454),
        (113.547827393, 13.829558641, -55.799090051),
        (56.803317251, 184.920119276, 0.94542009),
        (56.803317251, 20, 0.94542009),
        (82.392838546, 0, -24.644101204),
    ]]
    fillet(fillet_4_edges, radius=FILLET_4_R)


solid = Compound([part.part, body_2.part])
